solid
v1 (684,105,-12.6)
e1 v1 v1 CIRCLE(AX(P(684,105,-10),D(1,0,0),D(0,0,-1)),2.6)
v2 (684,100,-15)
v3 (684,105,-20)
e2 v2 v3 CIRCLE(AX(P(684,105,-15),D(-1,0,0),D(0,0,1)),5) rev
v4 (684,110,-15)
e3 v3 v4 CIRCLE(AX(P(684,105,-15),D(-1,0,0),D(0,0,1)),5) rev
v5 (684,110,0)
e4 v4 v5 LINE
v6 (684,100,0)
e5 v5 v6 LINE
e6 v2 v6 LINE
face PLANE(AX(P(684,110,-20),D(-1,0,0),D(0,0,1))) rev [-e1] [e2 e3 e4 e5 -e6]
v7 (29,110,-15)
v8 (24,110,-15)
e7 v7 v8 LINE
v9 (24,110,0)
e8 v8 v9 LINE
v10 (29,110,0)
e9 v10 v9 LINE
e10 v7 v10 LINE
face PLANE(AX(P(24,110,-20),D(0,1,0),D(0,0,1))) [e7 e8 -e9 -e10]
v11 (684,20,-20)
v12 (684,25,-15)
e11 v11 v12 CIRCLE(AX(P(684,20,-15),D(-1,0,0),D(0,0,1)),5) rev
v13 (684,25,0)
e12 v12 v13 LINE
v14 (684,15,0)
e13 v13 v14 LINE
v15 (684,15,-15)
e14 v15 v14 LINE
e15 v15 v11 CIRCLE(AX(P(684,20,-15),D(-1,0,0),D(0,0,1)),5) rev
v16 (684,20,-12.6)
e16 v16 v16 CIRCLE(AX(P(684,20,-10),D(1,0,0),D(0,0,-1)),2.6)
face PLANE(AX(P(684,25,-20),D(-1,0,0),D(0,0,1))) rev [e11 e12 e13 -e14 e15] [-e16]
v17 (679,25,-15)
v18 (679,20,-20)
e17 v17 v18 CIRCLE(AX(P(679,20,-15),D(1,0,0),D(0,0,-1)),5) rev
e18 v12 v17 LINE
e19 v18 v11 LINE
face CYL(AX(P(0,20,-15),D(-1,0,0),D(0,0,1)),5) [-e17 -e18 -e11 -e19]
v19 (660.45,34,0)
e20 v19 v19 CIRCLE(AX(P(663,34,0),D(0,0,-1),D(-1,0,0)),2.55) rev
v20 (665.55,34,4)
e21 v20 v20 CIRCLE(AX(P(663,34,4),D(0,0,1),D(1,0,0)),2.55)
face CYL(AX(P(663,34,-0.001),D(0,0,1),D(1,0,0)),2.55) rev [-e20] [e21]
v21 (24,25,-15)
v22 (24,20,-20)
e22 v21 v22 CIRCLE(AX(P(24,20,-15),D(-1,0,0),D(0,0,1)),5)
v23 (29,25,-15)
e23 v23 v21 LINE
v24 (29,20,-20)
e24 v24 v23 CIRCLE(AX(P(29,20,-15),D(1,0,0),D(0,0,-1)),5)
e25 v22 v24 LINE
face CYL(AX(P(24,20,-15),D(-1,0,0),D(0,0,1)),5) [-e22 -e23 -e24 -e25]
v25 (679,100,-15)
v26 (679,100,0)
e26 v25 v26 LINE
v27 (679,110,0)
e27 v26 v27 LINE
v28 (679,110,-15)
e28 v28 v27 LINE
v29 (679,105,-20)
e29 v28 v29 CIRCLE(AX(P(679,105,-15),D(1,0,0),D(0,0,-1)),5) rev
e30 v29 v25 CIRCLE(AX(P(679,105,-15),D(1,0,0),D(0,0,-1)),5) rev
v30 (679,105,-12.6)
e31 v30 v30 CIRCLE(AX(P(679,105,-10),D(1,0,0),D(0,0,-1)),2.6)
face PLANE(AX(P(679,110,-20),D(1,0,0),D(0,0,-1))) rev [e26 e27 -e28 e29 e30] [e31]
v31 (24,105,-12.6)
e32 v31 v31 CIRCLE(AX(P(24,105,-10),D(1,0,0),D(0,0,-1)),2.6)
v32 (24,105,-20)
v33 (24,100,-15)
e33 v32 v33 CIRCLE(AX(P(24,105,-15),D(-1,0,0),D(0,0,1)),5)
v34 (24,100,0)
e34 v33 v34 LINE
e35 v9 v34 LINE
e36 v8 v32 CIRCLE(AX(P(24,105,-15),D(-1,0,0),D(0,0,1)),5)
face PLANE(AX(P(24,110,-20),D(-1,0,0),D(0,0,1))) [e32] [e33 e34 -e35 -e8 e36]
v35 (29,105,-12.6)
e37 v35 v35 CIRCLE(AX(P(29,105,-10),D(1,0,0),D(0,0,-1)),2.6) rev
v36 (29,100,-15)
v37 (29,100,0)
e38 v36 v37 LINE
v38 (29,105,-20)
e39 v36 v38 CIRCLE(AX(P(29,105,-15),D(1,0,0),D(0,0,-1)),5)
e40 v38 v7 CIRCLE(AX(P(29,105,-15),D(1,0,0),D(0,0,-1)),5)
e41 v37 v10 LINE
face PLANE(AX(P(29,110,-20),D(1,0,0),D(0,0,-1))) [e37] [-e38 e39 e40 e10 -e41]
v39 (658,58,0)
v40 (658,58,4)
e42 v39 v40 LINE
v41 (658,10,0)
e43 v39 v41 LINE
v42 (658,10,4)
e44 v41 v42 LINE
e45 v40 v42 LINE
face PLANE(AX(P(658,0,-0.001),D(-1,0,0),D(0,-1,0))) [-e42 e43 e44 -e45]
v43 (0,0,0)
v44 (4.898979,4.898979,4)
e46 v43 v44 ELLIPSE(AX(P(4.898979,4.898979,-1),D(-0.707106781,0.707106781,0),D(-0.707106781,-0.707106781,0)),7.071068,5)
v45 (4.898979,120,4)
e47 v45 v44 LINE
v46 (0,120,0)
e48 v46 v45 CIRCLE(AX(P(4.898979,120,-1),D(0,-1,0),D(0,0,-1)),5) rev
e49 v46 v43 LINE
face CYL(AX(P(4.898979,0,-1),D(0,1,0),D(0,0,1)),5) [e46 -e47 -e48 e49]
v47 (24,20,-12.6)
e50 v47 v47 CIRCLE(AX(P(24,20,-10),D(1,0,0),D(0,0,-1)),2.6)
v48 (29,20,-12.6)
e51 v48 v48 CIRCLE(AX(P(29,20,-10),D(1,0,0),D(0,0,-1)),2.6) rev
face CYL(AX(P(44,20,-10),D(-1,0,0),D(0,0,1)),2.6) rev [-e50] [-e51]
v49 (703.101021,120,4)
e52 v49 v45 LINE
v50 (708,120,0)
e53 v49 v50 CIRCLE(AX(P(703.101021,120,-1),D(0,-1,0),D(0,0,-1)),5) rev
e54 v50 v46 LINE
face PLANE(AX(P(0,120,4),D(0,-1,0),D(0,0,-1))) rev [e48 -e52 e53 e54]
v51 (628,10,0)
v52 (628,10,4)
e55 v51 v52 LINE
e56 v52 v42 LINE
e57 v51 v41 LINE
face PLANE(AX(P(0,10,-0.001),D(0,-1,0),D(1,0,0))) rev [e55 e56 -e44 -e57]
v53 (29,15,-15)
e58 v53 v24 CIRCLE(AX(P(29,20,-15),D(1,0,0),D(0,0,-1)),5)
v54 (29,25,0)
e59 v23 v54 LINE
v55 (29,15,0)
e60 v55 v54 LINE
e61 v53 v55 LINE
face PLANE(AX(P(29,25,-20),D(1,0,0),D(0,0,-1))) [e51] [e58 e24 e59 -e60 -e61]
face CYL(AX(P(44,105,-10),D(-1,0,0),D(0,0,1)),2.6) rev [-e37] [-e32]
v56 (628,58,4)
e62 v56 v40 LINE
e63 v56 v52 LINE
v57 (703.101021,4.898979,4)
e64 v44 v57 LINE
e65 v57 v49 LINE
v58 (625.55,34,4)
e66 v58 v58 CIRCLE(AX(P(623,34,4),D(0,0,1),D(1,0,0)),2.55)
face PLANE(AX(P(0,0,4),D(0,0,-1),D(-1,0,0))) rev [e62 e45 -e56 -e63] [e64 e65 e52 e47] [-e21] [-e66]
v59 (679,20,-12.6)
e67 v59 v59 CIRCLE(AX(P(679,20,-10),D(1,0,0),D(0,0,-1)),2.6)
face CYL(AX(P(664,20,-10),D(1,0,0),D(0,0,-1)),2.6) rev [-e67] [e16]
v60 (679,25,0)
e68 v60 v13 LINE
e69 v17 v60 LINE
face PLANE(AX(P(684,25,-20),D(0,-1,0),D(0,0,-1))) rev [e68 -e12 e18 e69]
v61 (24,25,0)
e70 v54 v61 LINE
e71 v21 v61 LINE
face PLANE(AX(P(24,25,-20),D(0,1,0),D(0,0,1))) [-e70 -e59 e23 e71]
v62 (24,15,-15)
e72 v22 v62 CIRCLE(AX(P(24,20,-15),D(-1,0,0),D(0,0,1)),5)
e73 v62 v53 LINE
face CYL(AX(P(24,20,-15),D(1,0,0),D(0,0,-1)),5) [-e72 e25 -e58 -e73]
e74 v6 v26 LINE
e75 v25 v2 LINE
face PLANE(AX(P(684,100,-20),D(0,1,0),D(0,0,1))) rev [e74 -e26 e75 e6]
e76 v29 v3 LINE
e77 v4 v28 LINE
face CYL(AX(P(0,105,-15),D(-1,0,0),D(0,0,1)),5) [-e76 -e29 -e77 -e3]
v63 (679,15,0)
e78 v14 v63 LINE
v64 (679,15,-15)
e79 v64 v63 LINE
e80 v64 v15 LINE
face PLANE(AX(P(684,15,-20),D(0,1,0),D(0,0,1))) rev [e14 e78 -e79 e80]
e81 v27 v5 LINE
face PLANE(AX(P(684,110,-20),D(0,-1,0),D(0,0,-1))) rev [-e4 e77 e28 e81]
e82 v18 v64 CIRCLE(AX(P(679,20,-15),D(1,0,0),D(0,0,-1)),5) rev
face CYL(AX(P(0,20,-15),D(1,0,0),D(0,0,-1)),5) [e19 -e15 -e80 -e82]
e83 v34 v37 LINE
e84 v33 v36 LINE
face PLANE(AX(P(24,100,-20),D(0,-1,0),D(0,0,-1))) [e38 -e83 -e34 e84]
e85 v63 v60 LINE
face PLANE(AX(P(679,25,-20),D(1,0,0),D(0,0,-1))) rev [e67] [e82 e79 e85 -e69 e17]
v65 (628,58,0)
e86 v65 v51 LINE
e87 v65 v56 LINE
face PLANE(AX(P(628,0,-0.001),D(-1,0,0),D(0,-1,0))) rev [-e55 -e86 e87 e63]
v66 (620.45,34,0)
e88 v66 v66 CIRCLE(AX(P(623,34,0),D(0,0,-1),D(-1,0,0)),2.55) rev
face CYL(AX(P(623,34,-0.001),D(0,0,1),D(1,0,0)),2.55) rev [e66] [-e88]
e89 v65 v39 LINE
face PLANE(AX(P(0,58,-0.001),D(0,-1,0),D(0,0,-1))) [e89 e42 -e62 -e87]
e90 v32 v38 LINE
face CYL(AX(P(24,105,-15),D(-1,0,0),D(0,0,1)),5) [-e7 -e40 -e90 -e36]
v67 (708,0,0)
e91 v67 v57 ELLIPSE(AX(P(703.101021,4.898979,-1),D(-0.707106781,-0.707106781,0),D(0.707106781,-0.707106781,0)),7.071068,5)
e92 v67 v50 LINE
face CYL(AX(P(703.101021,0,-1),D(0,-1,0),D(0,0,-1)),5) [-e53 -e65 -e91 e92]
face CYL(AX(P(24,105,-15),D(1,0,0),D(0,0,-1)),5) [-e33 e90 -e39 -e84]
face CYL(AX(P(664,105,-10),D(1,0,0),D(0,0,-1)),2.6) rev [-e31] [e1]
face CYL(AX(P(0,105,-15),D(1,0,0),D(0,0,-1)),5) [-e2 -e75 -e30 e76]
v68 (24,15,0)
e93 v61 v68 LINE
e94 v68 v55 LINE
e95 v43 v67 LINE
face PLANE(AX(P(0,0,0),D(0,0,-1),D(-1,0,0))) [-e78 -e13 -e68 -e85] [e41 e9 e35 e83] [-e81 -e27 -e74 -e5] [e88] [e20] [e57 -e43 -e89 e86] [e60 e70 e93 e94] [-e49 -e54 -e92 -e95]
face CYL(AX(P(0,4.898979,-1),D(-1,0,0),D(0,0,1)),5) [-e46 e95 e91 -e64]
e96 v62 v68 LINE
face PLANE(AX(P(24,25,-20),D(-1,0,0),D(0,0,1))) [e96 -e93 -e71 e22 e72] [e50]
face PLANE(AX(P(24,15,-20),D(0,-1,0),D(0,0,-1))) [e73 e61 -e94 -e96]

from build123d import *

# Parameters (mm, degrees)
SKETCH1_W              = 708
SKETCH1_H              = 120
BOSS_EXTRUDE1_DEPTH    = 4
CUT_EXTRUDE1_REACH     = 720.109
SKETCH2_R              = 2.55
SKETCH2_W              = 30
SKETCH2_H              = 48
SKETCH3_W              = 5
SKETCH3_H              = 10
BOSS_EXTRUDE2_DEPTH    = 20
SKETCH4_R              = 2.6
CUT_EXTRUDE2_DEPTH     = 20
FILLET1_R              = 5
LPATTERN1_COUNT        = 2
LPATTERN1_PITCH        = 85
FILLET1_OF_LPATTERN1_R = 5
MIRROR5_START          = 24
MIRROR5_OUTLINE_R      = 2.6
MIRROR5_DEPTH          = 5
FILLET2_R              = 5


# Read off the part's stored shape, not the designer's step: Mirror5
# Some blends are built 0.0001 mm under size
with BuildPart() as part:
    # Sketch1 → Boss-Extrude1 (new body)
    with BuildSketch(Plane.XY):
        with Locations((354, 60)):
            Rectangle(SKETCH1_W, SKETCH1_H)
    extrude(amount=BOSS_EXTRUDE1_DEPTH)

    # Sketch2 → Cut-Extrude1 (cut, up to next)
    with BuildSketch(Plane.XY.offset(4), mode=Mode.PRIVATE) as cut_extrude1_sk1:
        with Locations((623, 34)):
            Circle(SKETCH2_R)
    cut_extrude1_tool1 = extrude(cut_extrude1_sk1.sketch, amount=-CUT_EXTRUDE1_REACH, mode=Mode.PRIVATE) & part.part
    # Sketch2 → Cut-Extrude1 (cut, up to next)
    with BuildSketch(Plane.XY.offset(4), mode=Mode.PRIVATE) as cut_extrude1_sk2:
        with Locations((663, 34)):
            Circle(SKETCH2_R)
    cut_extrude1_tool2 = extrude(cut_extrude1_sk2.sketch, amount=-CUT_EXTRUDE1_REACH, mode=Mode.PRIVATE) & part.part
    # Sketch2 → Cut-Extrude1 (cut, up to next)
    with BuildSketch(Plane.XY.offset(4), mode=Mode.PRIVATE) as cut_extrude1_sk3:
        with Locations((643, 34)):
            Rectangle(SKETCH2_W, SKETCH2_H)
    cut_extrude1_tool3 = extrude(cut_extrude1_sk3.sketch, amount=-CUT_EXTRUDE1_REACH, mode=Mode.PRIVATE) & part.part
    add(cut_extrude1_tool1.solids().sort_by_distance((623, 34, 4))[0], mode=Mode.SUBTRACT)
    add(cut_extrude1_tool2.solids().sort_by_distance((663, 34, 4))[0], mode=Mode.SUBTRACT)
    add(cut_extrude1_tool3.solids().sort_by_distance((643, 34, 4))[0], mode=Mode.SUBTRACT)

    # Sketch3 → Boss-Extrude2 (add)
    with BuildSketch(Plane(origin=(0, 0, 0), x_dir=(-1, 0, 0), z_dir=(0, 0, -1))):
        with Locations((-681.5, 20)):
            Rectangle(SKETCH3_W, SKETCH3_H)
    boss_extrude2 = extrude(amount=BOSS_EXTRUDE2_DEPTH)

    # Sketch4 → Cut-Extrude2 (cut)
    with BuildSketch(Plane(origin=(684, 0, 0), x_dir=(0, 0, -1), z_dir=(1, 0, 0))):
        with Locations((10, 20)):
            Circle(SKETCH4_R)
    cut_extrude2 = extrude(amount=-CUT_EXTRUDE2_DEPTH, mode=Mode.SUBTRACT)

    # Fillet1
    fillet1_edges = [part.edges().sort_by_distance(p)[0] for p in [
        (681.5, 15, -20),
        (681.5, 25, -20),
    ]]
    fillet(fillet1_edges, radius=FILLET1_R - 0.0001)  # a hair under: the kernel refuses the full size

    # LPattern1: Boss-Extrude2, Cut-Extrude2 ×2
    with Locations(*[(0, i * LPATTERN1_PITCH, 0) for i in range(1, LPATTERN1_COUNT)]):
        add(boss_extrude2)
        add(cut_extrude2, mode=Mode.SUBTRACT)

    # Fillet1 of LPattern1
    fillet1_of_lpattern1_edges = [part.edges().sort_by_distance(p)[0] for p in [
        (681.5, 100, -20),
        (681.5, 110, -20),
    ]]
    fillet(fillet1_of_lpattern1_edges, radius=FILLET1_OF_LPATTERN1_R - 0.0001)  # a hair under: the kernel refuses the full size

    # Mirror5 outline → Mirror5 (add)
    # profile 1 of 2: a face of its own
    with BuildSketch(Plane.YZ.offset(MIRROR5_START)):
        with BuildLine():
            Line((25, 0), (15, 0))
            Line((15, 0), (15, -15))
            ThreePointArc((15, -15), (16.464466094, -18.535533906), (20, -20))
            ThreePointArc((20, -20), (23.535533906, -18.535533906), (25, -15))
            Line((25, -15), (25, 0))
        make_face()
        with Locations((20, -10)):
            Circle(MIRROR5_OUTLINE_R, mode=Mode.SUBTRACT)
    # profile 2 of 2: a face of its own
    with BuildSketch(Plane.YZ.offset(MIRROR5_START)):
        with BuildLine():
            Line((110, 0), (100, 0))
            Line((100, 0), (100, -15))
            ThreePointArc((100, -15), (101.464466094, -18.535533906), (105, -20))
            ThreePointArc((105, -20), (108.535533906, -18.535533906), (110, -15))
            Line((110, -15), (110, 0))
        make_face()
        with Locations((105, -10)):
            Circle(MIRROR5_OUTLINE_R, mode=Mode.SUBTRACT)
    extrude(amount=MIRROR5_DEPTH)

    # Fillet2
    # the kernel refuses this fillet: 5 mm, written as the material it takes off along each edge
    with BuildSketch(Plane(origin=(0, 132.247448714, 4), x_dir=(1.5589751711781488e-12, 0, -1.0), z_dir=(0, -1, 0)), Plane(origin=(708, -12.247448714, 4), x_dir=(-1.5631940186717186e-12, 0, -1.0), z_dir=(0, 1, 0))) as fillet2_piece_1:
        with BuildLine():
            CenterArc((5, 4.898979486), FILLET2_R, 180, 78.463040967)
            Line((0, 4.898979486), (-0.1, 4.898979486))
            Line((-0.1, 4.898979486), (-0.1, 0))
            Line((-0.1, 0), (0, -0.1))
            ThreePointArc((0, -0.1), (2, -0.1), (3.98, -0.09797959))
            Line((3.98, -0.09797959), (4, 0))
        make_face()
    extrude(amount=144.494897428, mode=Mode.SUBTRACT)
    with BuildSketch(Plane(origin=(-12.247448714, 0, 4), x_dir=(0, 1.5725198920785669e-12, -1.0), z_dir=(1, 0, 0))) as fillet2_piece_2:
        with BuildLine():
            CenterArc((5, 4.898979486), FILLET2_R, 180, 78.463040967)
            Line((0, 4.898979486), (-0.1, 4.898979486))
            Line((-0.1, 4.898979486), (-0.1, 0))
            Line((-0.1, 0), (0, -0.1))
            ThreePointArc((0, -0.1), (2, -0.1), (3.98, -0.09797959))
            Line((3.98, -0.09797959), (4, 0))
        make_face()
    extrude(amount=732.494897428, mode=Mode.SUBTRACT)


solid = part.part
